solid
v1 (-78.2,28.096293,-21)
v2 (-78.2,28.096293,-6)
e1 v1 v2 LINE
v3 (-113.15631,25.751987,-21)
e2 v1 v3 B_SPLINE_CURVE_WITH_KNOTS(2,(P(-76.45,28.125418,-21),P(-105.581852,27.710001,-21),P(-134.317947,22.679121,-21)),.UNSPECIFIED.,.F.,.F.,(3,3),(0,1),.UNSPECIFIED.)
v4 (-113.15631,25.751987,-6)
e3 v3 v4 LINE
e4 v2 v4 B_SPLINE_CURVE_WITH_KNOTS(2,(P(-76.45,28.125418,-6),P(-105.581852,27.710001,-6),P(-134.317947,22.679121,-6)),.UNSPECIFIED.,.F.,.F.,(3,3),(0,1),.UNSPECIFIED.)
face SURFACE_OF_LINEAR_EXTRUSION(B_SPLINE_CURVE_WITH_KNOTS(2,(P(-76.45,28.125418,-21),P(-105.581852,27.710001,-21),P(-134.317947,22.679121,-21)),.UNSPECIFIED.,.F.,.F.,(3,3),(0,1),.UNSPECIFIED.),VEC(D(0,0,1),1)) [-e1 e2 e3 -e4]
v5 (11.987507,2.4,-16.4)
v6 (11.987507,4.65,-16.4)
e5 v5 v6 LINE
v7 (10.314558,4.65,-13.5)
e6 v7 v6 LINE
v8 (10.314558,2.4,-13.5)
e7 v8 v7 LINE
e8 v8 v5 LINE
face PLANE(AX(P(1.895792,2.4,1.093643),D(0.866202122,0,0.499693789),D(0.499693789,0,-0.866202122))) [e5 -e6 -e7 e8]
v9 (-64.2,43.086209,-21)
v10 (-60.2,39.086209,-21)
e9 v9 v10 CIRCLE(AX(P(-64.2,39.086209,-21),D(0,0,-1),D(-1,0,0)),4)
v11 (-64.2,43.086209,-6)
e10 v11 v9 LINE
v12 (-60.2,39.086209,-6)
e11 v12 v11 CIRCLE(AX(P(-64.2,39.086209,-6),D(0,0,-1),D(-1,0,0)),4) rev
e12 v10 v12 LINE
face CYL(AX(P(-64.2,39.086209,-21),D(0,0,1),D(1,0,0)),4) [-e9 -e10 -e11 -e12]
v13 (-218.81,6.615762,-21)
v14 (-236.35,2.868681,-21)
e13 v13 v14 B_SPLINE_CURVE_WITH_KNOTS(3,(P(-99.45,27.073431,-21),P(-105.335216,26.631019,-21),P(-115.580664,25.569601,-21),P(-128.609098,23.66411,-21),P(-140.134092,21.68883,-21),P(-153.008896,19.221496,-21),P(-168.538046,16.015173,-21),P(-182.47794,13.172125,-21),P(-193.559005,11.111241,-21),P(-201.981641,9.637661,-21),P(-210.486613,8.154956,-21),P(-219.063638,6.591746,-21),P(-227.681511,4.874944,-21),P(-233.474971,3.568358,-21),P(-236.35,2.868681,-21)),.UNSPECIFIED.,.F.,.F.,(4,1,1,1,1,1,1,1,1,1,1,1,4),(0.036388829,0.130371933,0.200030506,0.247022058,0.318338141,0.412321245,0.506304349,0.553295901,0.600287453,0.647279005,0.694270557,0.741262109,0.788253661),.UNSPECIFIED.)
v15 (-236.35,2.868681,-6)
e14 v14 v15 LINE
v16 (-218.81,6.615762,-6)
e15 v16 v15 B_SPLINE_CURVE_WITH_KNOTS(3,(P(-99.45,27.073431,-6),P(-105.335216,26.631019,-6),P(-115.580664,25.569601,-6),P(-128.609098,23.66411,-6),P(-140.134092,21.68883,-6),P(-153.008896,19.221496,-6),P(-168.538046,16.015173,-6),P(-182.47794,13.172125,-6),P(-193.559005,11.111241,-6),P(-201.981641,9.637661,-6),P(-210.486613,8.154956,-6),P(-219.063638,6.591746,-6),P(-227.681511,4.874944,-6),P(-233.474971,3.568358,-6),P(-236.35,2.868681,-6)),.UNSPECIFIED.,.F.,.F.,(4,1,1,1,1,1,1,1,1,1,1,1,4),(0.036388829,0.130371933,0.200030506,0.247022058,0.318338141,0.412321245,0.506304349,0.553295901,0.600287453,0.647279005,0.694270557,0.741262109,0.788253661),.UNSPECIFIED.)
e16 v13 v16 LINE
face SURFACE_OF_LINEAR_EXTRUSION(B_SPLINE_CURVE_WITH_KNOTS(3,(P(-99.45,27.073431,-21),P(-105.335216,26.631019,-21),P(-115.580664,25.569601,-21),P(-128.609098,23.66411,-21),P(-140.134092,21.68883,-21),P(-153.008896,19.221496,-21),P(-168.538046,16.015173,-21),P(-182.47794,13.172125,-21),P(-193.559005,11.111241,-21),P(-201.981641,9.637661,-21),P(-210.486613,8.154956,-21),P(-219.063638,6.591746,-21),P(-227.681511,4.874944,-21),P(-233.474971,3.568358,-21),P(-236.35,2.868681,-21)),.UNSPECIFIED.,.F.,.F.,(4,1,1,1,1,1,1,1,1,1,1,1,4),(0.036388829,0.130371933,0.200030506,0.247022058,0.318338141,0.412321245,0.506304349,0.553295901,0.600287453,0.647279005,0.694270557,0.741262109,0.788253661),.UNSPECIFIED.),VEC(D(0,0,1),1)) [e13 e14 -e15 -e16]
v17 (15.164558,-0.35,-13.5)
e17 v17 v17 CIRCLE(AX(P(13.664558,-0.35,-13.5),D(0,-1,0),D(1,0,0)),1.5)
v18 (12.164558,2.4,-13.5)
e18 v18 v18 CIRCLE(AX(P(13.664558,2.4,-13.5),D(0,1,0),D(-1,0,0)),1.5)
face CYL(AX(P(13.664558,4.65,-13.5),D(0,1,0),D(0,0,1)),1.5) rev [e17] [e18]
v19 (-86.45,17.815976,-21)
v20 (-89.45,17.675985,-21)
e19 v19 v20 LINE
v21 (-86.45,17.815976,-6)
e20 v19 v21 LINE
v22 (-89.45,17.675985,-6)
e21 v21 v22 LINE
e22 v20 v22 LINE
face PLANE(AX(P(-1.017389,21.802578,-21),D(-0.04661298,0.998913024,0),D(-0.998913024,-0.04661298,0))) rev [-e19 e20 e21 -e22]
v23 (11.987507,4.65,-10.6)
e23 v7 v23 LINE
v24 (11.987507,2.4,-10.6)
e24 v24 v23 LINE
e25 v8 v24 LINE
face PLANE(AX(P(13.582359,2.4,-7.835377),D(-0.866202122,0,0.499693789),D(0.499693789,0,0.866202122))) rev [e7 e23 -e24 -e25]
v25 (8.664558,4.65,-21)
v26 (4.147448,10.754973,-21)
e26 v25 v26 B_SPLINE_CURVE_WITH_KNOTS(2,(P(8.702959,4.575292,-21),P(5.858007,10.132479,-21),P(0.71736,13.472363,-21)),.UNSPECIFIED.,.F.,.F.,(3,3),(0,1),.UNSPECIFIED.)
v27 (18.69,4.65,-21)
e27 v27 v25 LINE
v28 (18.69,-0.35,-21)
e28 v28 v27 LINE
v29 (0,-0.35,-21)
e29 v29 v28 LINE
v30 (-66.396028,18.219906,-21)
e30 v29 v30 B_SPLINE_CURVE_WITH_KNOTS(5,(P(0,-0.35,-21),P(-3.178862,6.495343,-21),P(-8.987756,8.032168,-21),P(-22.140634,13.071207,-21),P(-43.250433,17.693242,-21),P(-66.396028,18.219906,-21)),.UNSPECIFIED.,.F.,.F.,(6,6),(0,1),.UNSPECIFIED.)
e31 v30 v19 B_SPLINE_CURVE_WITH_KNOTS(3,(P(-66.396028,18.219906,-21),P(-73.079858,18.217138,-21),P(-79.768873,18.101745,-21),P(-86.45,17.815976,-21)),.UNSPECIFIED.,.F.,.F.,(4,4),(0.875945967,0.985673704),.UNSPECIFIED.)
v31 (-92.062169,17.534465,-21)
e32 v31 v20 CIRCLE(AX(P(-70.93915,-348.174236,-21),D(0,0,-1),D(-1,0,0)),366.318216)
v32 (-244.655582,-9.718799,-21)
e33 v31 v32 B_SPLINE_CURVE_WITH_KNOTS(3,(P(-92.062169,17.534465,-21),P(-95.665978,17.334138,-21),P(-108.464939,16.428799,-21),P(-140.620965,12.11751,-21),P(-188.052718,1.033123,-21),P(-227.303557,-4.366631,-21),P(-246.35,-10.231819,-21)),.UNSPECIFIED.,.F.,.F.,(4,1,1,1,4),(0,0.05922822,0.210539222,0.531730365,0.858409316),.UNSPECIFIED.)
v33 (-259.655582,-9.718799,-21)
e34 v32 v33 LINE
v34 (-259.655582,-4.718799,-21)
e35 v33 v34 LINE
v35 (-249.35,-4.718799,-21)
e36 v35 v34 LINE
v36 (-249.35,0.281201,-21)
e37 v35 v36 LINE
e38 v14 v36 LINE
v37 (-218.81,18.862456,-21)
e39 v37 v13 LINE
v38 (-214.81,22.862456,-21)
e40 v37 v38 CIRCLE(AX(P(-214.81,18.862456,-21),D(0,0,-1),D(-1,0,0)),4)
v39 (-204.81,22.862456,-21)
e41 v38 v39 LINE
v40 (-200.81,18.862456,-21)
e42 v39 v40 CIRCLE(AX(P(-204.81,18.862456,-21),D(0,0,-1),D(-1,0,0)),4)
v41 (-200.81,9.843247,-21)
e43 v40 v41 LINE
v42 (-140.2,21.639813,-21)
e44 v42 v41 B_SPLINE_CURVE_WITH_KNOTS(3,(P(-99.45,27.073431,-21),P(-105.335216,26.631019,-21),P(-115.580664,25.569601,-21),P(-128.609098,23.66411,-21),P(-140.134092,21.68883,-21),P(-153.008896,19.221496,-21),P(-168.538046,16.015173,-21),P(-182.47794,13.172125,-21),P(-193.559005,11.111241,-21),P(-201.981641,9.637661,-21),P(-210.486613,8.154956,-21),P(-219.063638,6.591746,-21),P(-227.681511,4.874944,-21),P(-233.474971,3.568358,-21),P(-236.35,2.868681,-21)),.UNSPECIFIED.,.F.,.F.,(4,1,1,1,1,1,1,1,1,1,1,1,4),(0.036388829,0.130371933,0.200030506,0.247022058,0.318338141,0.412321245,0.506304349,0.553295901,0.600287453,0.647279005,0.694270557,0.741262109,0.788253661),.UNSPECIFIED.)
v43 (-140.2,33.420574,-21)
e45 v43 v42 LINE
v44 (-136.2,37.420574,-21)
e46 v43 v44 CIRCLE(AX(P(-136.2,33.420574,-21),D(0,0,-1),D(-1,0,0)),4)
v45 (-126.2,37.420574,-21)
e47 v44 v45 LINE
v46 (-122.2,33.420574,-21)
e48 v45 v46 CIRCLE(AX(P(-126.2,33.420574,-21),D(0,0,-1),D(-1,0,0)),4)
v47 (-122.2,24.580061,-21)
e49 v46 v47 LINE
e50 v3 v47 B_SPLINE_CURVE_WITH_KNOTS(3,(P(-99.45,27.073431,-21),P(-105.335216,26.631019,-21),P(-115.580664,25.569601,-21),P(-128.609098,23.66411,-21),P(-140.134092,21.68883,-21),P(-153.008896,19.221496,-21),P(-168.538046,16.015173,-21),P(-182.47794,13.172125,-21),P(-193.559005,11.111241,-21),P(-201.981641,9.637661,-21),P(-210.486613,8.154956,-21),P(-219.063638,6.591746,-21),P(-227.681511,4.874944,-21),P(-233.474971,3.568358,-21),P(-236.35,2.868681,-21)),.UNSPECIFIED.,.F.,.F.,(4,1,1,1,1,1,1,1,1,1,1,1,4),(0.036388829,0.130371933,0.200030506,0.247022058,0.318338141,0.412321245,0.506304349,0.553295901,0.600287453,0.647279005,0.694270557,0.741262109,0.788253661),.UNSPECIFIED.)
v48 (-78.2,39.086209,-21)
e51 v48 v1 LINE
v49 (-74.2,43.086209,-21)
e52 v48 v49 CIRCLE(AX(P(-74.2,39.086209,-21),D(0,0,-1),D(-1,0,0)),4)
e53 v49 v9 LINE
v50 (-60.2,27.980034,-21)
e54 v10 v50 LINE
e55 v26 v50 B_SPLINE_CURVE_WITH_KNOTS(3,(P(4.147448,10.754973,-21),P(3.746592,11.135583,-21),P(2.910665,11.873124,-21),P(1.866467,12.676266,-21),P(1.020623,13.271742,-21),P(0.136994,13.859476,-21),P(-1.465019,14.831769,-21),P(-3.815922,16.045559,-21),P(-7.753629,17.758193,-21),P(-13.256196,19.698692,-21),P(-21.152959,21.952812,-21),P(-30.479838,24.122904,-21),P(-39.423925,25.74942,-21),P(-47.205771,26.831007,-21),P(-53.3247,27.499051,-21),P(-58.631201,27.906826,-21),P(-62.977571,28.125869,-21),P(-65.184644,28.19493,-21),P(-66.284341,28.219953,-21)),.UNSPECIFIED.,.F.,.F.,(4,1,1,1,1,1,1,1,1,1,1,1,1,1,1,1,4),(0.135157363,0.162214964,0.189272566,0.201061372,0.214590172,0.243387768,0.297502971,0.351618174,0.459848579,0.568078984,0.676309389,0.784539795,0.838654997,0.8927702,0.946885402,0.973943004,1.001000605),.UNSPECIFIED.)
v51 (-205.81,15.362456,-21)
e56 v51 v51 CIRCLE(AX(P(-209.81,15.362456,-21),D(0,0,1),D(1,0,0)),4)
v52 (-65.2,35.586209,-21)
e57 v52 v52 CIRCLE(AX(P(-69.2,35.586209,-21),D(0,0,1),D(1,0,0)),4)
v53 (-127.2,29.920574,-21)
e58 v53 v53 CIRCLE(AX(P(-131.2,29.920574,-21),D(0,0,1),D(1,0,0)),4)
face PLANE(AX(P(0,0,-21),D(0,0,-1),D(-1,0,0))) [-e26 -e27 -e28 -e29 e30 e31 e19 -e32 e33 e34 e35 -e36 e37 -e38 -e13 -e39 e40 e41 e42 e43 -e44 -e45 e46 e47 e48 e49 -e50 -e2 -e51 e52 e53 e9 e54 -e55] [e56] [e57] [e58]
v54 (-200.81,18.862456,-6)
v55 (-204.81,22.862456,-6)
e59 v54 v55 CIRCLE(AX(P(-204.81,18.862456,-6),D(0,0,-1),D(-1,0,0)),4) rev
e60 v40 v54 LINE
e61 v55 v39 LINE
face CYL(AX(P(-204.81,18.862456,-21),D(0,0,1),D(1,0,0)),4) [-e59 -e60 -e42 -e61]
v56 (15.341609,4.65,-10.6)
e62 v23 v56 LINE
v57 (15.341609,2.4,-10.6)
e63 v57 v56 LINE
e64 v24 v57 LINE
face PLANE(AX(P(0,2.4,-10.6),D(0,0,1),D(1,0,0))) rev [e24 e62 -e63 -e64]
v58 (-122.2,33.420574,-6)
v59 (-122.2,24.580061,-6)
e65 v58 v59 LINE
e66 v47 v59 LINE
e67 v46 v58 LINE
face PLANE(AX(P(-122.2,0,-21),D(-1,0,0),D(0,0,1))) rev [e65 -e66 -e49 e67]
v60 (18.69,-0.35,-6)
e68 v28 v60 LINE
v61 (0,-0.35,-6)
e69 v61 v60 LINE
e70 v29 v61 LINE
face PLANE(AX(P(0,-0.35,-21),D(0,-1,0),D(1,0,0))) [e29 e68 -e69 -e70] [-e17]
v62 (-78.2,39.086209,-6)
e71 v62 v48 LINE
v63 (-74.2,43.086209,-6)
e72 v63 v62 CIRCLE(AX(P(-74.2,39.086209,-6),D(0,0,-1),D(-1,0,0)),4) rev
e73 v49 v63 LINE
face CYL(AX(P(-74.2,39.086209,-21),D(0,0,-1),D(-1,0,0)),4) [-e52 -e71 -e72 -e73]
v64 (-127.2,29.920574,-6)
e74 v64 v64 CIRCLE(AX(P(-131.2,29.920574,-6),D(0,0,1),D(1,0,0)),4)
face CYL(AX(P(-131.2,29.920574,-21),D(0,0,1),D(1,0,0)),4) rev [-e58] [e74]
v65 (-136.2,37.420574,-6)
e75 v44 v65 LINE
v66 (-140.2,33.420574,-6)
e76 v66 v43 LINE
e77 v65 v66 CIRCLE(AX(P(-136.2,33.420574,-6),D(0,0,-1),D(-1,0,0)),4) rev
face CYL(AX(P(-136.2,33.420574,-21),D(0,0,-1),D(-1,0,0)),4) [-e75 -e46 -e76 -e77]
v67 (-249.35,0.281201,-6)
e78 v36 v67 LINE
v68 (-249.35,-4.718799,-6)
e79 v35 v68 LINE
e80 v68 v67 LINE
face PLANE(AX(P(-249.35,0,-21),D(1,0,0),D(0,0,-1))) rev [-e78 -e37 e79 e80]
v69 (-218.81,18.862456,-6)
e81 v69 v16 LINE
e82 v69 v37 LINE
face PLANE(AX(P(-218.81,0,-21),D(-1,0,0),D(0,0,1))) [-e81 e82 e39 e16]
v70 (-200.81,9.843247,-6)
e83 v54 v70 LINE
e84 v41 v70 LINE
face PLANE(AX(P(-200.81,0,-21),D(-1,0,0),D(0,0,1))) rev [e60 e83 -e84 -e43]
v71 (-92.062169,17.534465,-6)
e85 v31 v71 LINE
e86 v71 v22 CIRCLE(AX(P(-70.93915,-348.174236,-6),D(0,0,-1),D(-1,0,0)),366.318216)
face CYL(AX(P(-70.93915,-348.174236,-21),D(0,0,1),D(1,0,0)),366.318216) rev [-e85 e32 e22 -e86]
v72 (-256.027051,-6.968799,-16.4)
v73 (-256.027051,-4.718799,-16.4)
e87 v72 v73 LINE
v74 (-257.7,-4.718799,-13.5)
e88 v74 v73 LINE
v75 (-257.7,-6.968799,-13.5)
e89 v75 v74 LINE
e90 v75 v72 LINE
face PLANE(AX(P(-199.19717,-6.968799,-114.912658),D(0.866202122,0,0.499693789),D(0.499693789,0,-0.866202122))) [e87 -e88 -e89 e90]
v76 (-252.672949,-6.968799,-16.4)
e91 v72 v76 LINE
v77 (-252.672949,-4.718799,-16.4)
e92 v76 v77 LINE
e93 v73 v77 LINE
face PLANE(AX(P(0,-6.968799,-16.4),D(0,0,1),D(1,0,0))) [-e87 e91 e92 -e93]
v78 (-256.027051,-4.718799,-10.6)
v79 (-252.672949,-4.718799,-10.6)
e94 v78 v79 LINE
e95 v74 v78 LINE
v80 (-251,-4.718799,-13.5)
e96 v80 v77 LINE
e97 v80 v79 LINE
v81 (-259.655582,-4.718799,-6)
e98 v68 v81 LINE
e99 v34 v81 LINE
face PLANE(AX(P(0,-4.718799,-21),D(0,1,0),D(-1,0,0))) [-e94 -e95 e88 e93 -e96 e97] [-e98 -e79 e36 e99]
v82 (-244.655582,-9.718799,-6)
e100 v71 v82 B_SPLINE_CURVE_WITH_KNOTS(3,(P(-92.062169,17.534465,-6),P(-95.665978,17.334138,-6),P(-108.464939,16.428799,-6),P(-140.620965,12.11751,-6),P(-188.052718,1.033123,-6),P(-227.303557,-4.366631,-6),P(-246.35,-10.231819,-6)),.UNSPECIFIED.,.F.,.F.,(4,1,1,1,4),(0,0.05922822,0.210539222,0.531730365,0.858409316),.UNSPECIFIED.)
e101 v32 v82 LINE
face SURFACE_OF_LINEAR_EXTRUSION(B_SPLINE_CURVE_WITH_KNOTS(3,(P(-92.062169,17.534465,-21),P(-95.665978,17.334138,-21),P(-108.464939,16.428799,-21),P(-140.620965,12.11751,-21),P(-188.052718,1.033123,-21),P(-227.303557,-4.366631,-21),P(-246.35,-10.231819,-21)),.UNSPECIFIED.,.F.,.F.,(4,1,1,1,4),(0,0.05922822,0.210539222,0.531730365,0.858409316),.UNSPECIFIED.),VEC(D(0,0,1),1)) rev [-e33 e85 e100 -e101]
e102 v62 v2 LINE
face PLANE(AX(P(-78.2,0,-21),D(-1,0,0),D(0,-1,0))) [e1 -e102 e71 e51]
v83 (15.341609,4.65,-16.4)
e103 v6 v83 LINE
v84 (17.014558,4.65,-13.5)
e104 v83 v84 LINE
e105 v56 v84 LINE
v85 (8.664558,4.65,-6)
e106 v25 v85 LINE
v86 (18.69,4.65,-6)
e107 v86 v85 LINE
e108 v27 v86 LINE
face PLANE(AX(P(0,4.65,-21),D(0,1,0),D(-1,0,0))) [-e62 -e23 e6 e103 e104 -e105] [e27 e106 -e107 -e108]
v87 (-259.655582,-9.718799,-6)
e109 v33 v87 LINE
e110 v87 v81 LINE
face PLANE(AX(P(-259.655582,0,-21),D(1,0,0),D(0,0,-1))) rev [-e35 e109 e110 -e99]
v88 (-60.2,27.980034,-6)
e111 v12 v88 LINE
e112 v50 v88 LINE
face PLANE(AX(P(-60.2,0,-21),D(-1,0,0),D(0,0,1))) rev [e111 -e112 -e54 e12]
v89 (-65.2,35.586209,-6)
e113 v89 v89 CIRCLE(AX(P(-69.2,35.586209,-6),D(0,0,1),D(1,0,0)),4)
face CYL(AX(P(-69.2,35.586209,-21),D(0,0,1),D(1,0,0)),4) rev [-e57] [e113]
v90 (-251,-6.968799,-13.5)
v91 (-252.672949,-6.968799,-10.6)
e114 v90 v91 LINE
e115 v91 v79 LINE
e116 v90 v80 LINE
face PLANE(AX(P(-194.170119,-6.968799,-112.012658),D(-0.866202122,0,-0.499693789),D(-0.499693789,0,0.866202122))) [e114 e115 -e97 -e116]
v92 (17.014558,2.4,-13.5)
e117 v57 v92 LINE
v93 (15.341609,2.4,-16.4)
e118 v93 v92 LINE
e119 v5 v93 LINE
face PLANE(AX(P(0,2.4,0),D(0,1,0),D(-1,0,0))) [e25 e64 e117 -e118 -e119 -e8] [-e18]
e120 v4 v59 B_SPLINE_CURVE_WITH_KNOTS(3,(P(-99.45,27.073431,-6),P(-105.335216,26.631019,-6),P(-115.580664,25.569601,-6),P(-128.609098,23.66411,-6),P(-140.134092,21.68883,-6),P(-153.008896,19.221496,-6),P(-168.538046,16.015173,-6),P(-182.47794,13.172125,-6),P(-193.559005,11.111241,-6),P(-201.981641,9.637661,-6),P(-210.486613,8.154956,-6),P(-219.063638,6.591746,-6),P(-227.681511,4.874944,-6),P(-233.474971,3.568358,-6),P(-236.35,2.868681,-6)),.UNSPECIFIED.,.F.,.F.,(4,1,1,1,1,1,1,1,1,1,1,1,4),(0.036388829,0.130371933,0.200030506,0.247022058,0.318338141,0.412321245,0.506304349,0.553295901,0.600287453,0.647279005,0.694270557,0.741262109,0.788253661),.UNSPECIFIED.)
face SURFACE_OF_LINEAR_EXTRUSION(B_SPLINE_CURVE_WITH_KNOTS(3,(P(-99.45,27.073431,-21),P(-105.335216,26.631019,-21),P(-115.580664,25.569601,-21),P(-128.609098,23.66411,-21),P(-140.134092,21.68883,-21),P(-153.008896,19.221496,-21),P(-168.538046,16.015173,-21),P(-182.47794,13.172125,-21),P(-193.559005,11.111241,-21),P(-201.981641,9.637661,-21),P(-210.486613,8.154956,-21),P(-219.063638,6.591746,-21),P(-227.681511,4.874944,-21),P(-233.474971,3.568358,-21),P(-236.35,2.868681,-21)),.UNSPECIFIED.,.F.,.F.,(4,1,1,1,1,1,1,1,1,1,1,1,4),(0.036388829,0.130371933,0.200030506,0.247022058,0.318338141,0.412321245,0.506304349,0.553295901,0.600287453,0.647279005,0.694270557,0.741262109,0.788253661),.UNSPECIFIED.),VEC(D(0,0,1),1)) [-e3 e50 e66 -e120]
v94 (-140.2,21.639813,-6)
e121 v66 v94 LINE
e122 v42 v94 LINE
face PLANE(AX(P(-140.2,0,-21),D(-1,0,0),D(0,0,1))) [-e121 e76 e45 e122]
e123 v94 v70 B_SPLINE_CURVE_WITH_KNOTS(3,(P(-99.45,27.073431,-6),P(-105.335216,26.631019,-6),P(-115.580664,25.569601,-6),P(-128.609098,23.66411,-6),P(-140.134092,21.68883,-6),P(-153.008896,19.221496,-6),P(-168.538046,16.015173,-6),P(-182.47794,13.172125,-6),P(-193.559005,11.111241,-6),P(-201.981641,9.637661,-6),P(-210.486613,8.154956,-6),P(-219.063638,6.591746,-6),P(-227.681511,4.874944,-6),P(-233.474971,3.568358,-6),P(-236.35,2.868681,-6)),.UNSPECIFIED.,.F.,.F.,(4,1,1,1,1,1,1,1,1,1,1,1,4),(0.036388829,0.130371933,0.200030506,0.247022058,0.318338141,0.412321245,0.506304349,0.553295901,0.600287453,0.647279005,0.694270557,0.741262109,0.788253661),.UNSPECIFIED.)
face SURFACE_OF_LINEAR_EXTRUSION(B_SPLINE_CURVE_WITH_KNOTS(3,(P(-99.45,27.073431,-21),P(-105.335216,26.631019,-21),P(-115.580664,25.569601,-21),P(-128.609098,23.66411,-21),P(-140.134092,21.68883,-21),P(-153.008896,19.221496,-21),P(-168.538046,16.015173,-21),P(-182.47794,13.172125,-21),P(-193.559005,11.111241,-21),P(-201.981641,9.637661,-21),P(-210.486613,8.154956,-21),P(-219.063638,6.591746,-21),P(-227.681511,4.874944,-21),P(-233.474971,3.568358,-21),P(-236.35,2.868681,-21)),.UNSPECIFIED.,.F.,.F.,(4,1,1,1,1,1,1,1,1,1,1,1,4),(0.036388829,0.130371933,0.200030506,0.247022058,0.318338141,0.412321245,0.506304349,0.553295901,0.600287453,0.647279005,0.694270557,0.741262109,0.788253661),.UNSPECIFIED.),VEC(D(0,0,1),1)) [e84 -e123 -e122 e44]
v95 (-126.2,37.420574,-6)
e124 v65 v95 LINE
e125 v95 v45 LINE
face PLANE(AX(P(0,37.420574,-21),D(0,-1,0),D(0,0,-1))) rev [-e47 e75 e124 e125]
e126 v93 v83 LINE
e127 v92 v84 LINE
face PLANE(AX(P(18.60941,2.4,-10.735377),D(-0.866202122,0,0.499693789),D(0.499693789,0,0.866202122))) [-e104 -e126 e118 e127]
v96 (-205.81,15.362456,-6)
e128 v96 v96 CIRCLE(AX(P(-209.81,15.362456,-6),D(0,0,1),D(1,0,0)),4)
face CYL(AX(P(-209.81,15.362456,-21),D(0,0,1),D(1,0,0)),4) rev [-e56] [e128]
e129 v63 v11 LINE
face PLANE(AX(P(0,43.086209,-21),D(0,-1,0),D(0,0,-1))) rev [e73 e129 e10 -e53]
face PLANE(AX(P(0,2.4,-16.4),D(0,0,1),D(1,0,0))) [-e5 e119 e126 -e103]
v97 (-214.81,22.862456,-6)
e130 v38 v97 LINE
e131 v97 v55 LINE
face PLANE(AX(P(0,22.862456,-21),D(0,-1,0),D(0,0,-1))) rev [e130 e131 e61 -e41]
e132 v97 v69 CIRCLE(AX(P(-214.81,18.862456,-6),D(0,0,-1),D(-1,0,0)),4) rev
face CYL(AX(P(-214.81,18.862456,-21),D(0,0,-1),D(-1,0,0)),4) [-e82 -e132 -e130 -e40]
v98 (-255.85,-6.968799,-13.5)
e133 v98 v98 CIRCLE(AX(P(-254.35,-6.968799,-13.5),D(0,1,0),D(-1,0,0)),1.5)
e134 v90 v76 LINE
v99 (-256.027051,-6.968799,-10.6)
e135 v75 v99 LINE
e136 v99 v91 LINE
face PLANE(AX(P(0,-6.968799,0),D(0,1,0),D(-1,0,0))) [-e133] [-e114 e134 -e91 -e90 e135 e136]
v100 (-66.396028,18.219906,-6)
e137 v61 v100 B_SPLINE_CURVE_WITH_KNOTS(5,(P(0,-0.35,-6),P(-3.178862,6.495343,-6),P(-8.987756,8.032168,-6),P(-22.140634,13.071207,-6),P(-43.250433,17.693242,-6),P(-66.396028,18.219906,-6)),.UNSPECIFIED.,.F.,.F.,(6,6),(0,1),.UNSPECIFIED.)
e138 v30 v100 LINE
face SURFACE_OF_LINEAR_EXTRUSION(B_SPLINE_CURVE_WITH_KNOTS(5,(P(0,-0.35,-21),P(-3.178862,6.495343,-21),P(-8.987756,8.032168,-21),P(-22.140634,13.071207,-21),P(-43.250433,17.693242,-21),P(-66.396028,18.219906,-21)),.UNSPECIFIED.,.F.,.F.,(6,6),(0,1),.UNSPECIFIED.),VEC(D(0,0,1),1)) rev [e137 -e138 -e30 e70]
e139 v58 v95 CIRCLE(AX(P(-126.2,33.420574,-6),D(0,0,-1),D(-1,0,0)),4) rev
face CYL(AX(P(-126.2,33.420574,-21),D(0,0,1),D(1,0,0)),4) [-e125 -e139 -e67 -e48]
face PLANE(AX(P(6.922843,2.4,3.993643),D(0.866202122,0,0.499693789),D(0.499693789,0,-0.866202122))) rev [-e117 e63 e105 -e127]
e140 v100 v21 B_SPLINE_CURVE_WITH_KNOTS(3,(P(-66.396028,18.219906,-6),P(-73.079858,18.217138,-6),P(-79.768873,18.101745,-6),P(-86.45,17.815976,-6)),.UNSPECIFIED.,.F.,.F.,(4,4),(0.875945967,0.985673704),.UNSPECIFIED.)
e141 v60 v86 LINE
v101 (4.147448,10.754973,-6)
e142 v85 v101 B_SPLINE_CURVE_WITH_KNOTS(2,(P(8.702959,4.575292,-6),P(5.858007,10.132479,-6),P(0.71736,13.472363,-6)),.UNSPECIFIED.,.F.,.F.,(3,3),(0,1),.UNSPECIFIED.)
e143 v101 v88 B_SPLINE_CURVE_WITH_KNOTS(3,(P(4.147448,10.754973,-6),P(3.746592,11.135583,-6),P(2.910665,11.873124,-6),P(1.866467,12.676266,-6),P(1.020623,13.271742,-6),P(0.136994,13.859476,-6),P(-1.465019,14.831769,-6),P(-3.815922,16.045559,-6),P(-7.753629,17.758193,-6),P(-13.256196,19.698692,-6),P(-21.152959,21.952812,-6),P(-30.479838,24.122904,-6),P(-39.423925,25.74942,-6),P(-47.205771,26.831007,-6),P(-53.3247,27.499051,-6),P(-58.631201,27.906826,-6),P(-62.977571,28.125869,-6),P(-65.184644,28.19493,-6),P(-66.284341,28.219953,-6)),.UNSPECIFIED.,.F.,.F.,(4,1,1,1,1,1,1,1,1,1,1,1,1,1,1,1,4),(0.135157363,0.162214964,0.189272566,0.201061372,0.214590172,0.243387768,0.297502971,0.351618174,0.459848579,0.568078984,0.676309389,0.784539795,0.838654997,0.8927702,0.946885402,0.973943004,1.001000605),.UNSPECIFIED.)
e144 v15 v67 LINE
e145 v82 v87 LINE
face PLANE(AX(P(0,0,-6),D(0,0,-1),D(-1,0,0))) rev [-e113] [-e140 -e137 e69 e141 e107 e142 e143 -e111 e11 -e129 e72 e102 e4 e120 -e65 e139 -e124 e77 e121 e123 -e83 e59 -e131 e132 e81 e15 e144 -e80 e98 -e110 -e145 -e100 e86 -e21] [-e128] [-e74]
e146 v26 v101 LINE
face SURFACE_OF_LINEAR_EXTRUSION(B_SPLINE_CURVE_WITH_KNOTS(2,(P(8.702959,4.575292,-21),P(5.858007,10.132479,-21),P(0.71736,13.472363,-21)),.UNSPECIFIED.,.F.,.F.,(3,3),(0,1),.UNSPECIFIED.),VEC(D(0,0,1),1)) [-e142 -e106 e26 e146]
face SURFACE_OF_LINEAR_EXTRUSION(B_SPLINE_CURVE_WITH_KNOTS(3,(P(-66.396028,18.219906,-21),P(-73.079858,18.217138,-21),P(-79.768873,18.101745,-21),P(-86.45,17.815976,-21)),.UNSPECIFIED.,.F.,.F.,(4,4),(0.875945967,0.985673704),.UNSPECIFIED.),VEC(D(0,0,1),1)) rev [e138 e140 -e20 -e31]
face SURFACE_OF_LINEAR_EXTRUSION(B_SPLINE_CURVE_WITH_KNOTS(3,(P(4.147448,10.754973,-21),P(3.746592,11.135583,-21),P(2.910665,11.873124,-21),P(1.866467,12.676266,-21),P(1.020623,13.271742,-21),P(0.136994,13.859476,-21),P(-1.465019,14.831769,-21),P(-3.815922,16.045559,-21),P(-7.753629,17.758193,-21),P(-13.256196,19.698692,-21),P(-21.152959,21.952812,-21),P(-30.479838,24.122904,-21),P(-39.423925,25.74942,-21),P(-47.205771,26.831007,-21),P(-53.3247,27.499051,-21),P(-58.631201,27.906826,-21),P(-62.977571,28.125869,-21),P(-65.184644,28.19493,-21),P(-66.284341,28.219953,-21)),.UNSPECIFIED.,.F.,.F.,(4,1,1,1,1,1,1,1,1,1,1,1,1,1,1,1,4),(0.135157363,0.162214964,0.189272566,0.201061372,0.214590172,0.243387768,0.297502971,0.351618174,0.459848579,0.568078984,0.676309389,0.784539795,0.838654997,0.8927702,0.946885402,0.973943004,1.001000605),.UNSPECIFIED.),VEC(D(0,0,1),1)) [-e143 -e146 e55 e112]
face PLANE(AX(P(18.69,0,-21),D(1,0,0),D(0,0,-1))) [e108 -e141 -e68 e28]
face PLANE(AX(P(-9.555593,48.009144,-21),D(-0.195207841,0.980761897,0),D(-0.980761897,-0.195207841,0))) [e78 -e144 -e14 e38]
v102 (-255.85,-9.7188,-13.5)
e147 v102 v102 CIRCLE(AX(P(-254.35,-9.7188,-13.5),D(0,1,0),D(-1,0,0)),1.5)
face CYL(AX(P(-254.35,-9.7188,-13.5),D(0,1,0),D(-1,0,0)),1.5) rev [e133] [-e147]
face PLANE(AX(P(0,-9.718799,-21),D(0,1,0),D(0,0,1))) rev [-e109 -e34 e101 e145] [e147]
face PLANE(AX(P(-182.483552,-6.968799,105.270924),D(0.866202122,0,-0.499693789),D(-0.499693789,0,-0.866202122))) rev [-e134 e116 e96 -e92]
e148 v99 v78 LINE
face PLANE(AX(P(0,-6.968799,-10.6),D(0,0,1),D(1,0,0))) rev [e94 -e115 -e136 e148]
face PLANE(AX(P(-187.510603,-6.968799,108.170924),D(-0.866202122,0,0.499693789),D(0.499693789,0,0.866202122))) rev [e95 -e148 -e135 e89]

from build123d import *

# Parameters (mm, degrees)
BOSS_EXTRUDE14_DEPTH            = 15
SKETCH9_W                       = 10.305582395
SKETCH9_H                       = 5
BOSS_EXTRUDE15_DEPTH            = 15
BOSS_EXTRUDE16_START            = -15
BOSS_EXTRUDE16_OUTLINE_R        = 4
BOSS_EXTRUDE16_DEPTH            = 15
FILLET1_R                       = 4
CUT_EXTRUDE2_DEPTH              = 2.25
CUT_EXTRUDE3_DEPTH              = 2.25
F_3_0MM_DOWEL_HOLE1_D           = 3
F_3_0MM_DOWEL_HOLE1_CSINK_D     = 3.05
F_3_0MM_DOWEL_HOLE1_CSINK_ANGLE = 90
SKETCH16_R                      = 1.5
CUT_EXTRUDE4_DEPTH              = 265.853431953


# Read off the part's stored shape, not the designer's step: Boss-Extrude14, Boss-Extrude16
with BuildPart() as part:
    # Boss-Extrude14 outline → Boss-Extrude14 (new body)
    with BuildSketch(Plane(origin=(0, 0, -6), x_dir=(-1, 0, 0), z_dir=(0, 0, -1))):
        with BuildLine():
            Line((249.35, -9.718799499), (249.35, 0.281200501))
            Line((249.35, 0.281200501), (236.35, 2.868680647))
            add(Edge.make_bspline(
                [(113.156309789, 25.751987472), (114.460208978, 25.59959164), (120.100287856, 24.908577179), (128.609098159, 23.664110071), (140.134091586, 21.688830409), (153.008895552, 19.221496185), (168.538046321, 16.015172699), (182.477939999, 13.172125281), (193.559005245, 11.111240975), (201.981640704, 9.637661129), (210.486612866, 8.154956205), (219.063637957, 6.591746422), (227.68151116, 4.874943897), (233.474971, 3.568357951), (236.35, 2.868680647)],
                knots=[0.109458463, 0.109458463, 0.109458463, 0.109458463, 0.130371933, 0.200030506, 0.247022058, 0.318338141, 0.412321245, 0.506304349, 0.553295901, 0.600287453, 0.647279005, 0.694270557, 0.741262109, 0.788253661, 0.788253661, 0.788253661, 0.788253661], degree=3))
            add(Edge.make_bspline(
                [(76.45, 28.125418087), (94.882372903, 27.862574162), (113.156309789, 25.751987472)],
                knots=[0, 0, 0, 0.632722323, 0.632722323, 0.632722323], degree=2))
            add(Edge.make_bspline(
                [(66.284340587, 28.219952736), (67.129544996, 28.219602739), (68.818588071, 28.215923169), (71.36030606, 28.198672488), (73.903160315, 28.169538769), (75.601337427, 28.141603711), (76.45, 28.125418087)],
                knots=[0.875312122, 0.875312122, 0.875312122, 0.875312122, 0.888961276, 0.902610431, 0.916259586, 0.92990874, 0.92990874, 0.92990874, 0.92990874], degree=3))
            add(Edge.make_bspline(
                [(-4.147448422, 10.754973325), (-3.746592061, 11.135583203), (-2.910664688, 11.873123525), (-1.8664669, 12.676265805), (-1.020623492, 13.271741618), (-0.136993775, 13.859475937), (1.465019188, 14.831768722), (3.815921844, 16.045559455), (7.753628889, 17.758192835), (13.256195767, 19.698691993), (21.152959065, 21.952811545), (30.479838242, 24.122904012), (39.4239247, 25.749420494), (47.205771024, 26.831006606), (53.324700432, 27.499051298), (58.631201034, 27.906826379), (62.977570557, 28.125868706), (65.18464413, 28.194929818), (66.284340587, 28.219952736)],
                knots=[0.135157363, 0.135157363, 0.135157363, 0.135157363, 0.162214964, 0.189272566, 0.201061372, 0.214590172, 0.243387768, 0.297502971, 0.351618174, 0.459848579, 0.568078984, 0.676309389, 0.784539795, 0.838654997, 0.8927702, 0.946885402, 0.973943004, 1.001000605, 1.001000605, 1.001000605, 1.001000605], degree=3))
            add(Edge.make_bspline(
                [(-8.702959439, 4.575291566), (-6.890883257, 8.114910032), (-4.147448422, 10.754973325)],
                knots=[0, 0, 0, 0.636944249, 0.636944249, 0.636944249], degree=2))
            add(Edge.make_bspline(
                [(-8.702959439, 4.575291566), (-8.771267052, 4.454592439), (-8.899970783, 4.219174636), (-9.174274638, 3.674724808), (-9.523622742, 2.874059155), (-9.910621046, 1.66916954), (-10.123727188, 0.514933148), (-10.179306724, -0.189247064), (-10.188216911, -0.35)],
                knots=[0, 0, 0, 0, 0.000508489, 0.001016978, 0.002033955, 0.003050933, 0.00394155, 0.004195794, 0.004195794, 0.004195794, 0.004195794], degree=3))
            Line((-10.188216911, -0.35), (0, -0.35))
            add(Edge.make_bspline(
                [(0, -0.35), (3.178862469, 6.495343287), (8.987756305, 8.032168144), (22.140633739, 13.071207305), (43.250433247, 17.69324185), (66.39602757, 18.219905629)],
                knots=[0, 0, 0, 0, 0, 0, 1, 1, 1, 1, 1, 1], degree=5))
            add(Edge.make_bspline(
                [(66.39602757, 18.219905629), (73.079858249, 18.217137873), (79.768873399, 18.101745103), (86.45, 17.815976098)],
                knots=[0.875945967, 0.875945967, 0.875945967, 0.875945967, 0.985673704, 0.985673704, 0.985673704, 0.985673704], degree=3))
            Line((86.45, 17.815976098), (89.45, 17.675984992))
            ThreePointArc((89.45, 17.675984992), (90.756210616, 17.607556707), (92.062168571, 17.534464817))
            add(Edge.make_bspline(
                [(92.062168571, 17.534464817), (95.665977641, 17.334138157), (108.464938821, 16.428798519), (140.620964858, 12.117510077), (187.478425037, 1.167330167), (226.131267819, -4.204534739), (244.655582392, -9.718799508)],
                knots=[0, 0, 0, 0, 0.05922822, 0.210539222, 0.531730365, 0.848733007, 0.848733007, 0.848733007, 0.848733007], degree=3))
            Line((244.655582392, -9.718799508), (249.35, -9.718799499))
        make_face()
    extrude(amount=BOSS_EXTRUDE14_DEPTH)

    # Sketch9 → Boss-Extrude15 (add)
    with BuildSketch(Plane.XY.offset(-6)):
        with BuildLine():
            add(Edge.make_bspline(
                [(8.702959439, 4.575291566), (8.771267052, 4.454592439), (8.899970783, 4.219174636), (9.174274638, 3.674724808), (9.523622742, 2.874059155), (9.910621046, 1.66916954), (10.123727188, 0.514933148), (10.179306724, -0.189247064), (10.188216911, -0.35)],
                knots=[0, 0, 0, 0, 0.000508489, 0.001016978, 0.002033955, 0.003050933, 0.00394155, 0.004195794, 0.004195794, 0.004195794, 0.004195794], degree=3))
            Line((10.188216911, -0.35), (18.69, -0.35))
            Line((18.69, -0.35), (18.69, 4.65))
            Line((18.69, 4.65), (8.664557691, 4.65))
            add(Edge.make_bspline(
                [(8.702959439, 4.575291566), (8.683810567, 4.612696009), (8.664557691, 4.65)],
                knots=[0, 0, 0, 0.006730823, 0.006730823, 0.006730823], degree=2))
        make_face()
        with Locations((-254.502791198, -7.218799499)):
            Rectangle(SKETCH9_W, SKETCH9_H)
    extrude(amount=-BOSS_EXTRUDE15_DEPTH)

    # Boss-Extrude16 outline → Boss-Extrude16 (add)
    # profile 1 of 3: a face of its own
    with BuildSketch(Plane.XY.offset(-6).offset(BOSS_EXTRUDE16_START)):
        with BuildLine():
            add(Edge.make_bspline(
                [(-200.81, 9.843246703), (-201.204842604, 9.774216263), (-204.419312994, 9.212692224), (-210.400725126, 8.169929349), (-216.031409877, 7.144376286), (-218.81, 6.615762453)],
                knots=[0.593701678, 0.593701678, 0.593701678, 0.593701678, 0.600287453, 0.647279005, 0.69284692, 0.69284692, 0.69284692, 0.69284692], degree=3))
            Line((-200.81, 9.843246703), (-200.81, 22.86245595))
            Line((-200.81, 22.86245595), (-218.81, 22.86245595))
            Line((-218.81, 22.86245595), (-218.81, 6.615762453))
        make_face()
        with Locations((-209.81, 15.36245595)):
            Circle(BOSS_EXTRUDE16_OUTLINE_R, mode=Mode.SUBTRACT)
    # profile 2 of 3: a face of its own
    with BuildSketch(Plane.XY.offset(-6).offset(BOSS_EXTRUDE16_START)):
        with BuildLine():
            add(Edge.make_bspline(
                [(-122.199999995, 24.58006078), (-124.804407306, 24.210507661), (-130.301243555, 23.374091651), (-136.28735582, 22.348126136), (-139.677142176, 21.735093133), (-140.2, 21.639813309)],
                knots=[0.15796988, 0.15796988, 0.15796988, 0.15796988, 0.200030506, 0.247022058, 0.255600029, 0.255600029, 0.255600029, 0.255600029], degree=3))
            Line((-122.199999995, 24.58006078), (-122.2, 37.420573855))
            Line((-122.2, 37.420573855), (-140.2, 37.420573855))
            Line((-140.2, 37.420573855), (-140.2, 21.639813309))
        make_face()
        with Locations((-131.2, 29.920573855)):
            Circle(BOSS_EXTRUDE16_OUTLINE_R, mode=Mode.SUBTRACT)
    # profile 3 of 3: a face of its own
    with BuildSketch(Plane.XY.offset(-6).offset(BOSS_EXTRUDE16_START)):
        with BuildLine():
            Line((-60.199999997, 27.980034372), (-60.2, 43.08620947))
            Line((-60.2, 43.08620947), (-78.2, 43.08620947))
            Line((-78.2, 43.08620947), (-78.199999995, 28.096292606))
            add(Edge.make_bspline(
                [(-76.45, 28.125418087), (-77.325178587, 28.112938121), (-78.199999995, 28.096292606)],
                knots=[0, 0, 0, 0.030041983, 0.030041983, 0.030041983], degree=2))
            add(Edge.make_bspline(
                [(-66.284340587, 28.219952736), (-67.129544996, 28.219602739), (-68.818588071, 28.215923169), (-71.36030606, 28.198672488), (-73.903160315, 28.169538769), (-75.601337427, 28.141603711), (-76.45, 28.125418087)],
                knots=[0.875312122, 0.875312122, 0.875312122, 0.875312122, 0.888961276, 0.902610431, 0.916259586, 0.92990874, 0.92990874, 0.92990874, 0.92990874], degree=3))
            add(Edge.make_bspline(
                [(-60.199999997, 27.980034372), (-61.122523668, 28.03215495), (-63.139027933, 28.130920838), (-65.18464413, 28.194929818), (-66.284340587, 28.219952736)],
                knots=[0.950844173, 0.950844173, 0.950844173, 0.950844173, 0.973943004, 1.001000605, 1.001000605, 1.001000605, 1.001000605], degree=3))
        make_face()
        with Locations((-69.2, 35.58620947)):
            Circle(BOSS_EXTRUDE16_OUTLINE_R, mode=Mode.SUBTRACT)
    extrude(amount=BOSS_EXTRUDE16_DEPTH)

    # Fillet1
    fillet1_edges = [part.edges().sort_by_distance(p)[0] for p in [
        (-200.81, 22.86245595, -13.5),
        (-218.81, 22.86245595, -13.5),
        (-140.2, 37.420573855, -13.5),
        (-122.2, 37.420573855, -13.5),
        (-60.2, 43.08620947, -13.5),
        (-78.2, 43.08620947, -13.5),
    ]]
    fillet(fillet1_edges, radius=FILLET1_R)

    # Sketch12 → Cut-Extrude2 (cut)
    with BuildSketch(Plane(origin=(0, -4.718799499, 0), x_dir=(1, 0, 0), z_dir=(0, 1, 0))):
        with BuildLine():
            Line((-252.85, 13.5), (-251, 13.5))
            Line((-251, 13.5), (-252.672949017, 16.4))
            Line((-252.672949017, 16.4), (-256.027050983, 16.4))
            Line((-256.027050983, 16.4), (-257.7, 13.5))
            Line((-257.7, 13.5), (-255.85, 13.5))
            ThreePointArc((-255.85, 13.5), (-254.35, 15), (-252.85, 13.5))
        make_face()
        with BuildLine():
            Line((-252.672949017, 10.6), (-251, 13.5))
            Line((-251, 13.5), (-252.85, 13.5))
            ThreePointArc((-252.85, 13.5), (-254.35, 12), (-255.85, 13.5))
            Line((-255.85, 13.5), (-257.7, 13.5))
            Line((-257.7, 13.5), (-256.027050983, 10.6))
            Line((-256.027050983, 10.6), (-252.672949017, 10.6))
        make_face()
        with BuildLine():
            ThreePointArc((-255.85, 13.5), (-254.35, 12), (-252.85, 13.5))
            Line((-252.85, 13.5), (-254.35, 13.5))
            Line((-254.35, 13.5), (-255.85, 13.5))
        make_face()
    extrude(amount=-CUT_EXTRUDE2_DEPTH, mode=Mode.SUBTRACT)

    # Sketch14 → Cut-Extrude3 (cut)
    with BuildSketch(Plane(origin=(0, 4.65, 0), x_dir=(1, 0, 0), z_dir=(0, 1, 0))):
        with BuildLine():
            ThreePointArc((13.664557695, 15), (14.725217866, 14.560660172), (15.164557695, 13.5))
            Line((15.164557695, 13.5), (17.014557695, 13.5))
            Line((17.014557695, 13.5), (15.341608678, 16.4))
            Line((15.341608678, 16.4), (13.664557695, 16.4))
            Line((13.664557695, 16.4), (13.664557695, 15))
        make_face()
        with BuildLine():
            Line((10.314557695, 13.5), (12.164557695, 13.5))
            ThreePointArc((12.164557695, 13.5), (12.603897523, 14.560660172), (13.664557695, 15))
            Line((13.664557695, 15), (13.664557695, 16.4))
            Line((13.664557695, 16.4), (11.987506712, 16.4))
            Line((11.987506712, 16.4), (10.314557695, 13.5))
        make_face()
        with BuildLine():
            Line((11.987506712, 10.6), (13.664557695, 10.6))
            Line((13.664557695, 10.6), (13.664557695, 12))
            ThreePointArc((13.664557695, 12), (12.603897523, 12.439339828), (12.164557695, 13.5))
            Line((12.164557695, 13.5), (10.314557695, 13.5))
            Line((10.314557695, 13.5), (11.987506712, 10.6))
        make_face()
        with BuildLine():
            Line((13.664557695, 12), (13.664557695, 10.6))
            Line((13.664557695, 10.6), (15.341608678, 10.6))
            Line((15.341608678, 10.6), (17.014557695, 13.5))
            Line((17.014557695, 13.5), (15.164557695, 13.5))
            ThreePointArc((15.164557695, 13.5), (14.725217866, 12.439339828), (13.664557695, 12))
        make_face()
    extrude(amount=-CUT_EXTRUDE3_DEPTH, mode=Mode.SUBTRACT)

    # Ø3.0mm Dowel Hole1 (through all)
    with Locations(Plane(origin=(0, 4.65, 0), x_dir=(1, 0, 0), z_dir=(0, 1, 0))):
        with Locations((13.664557695, 13.5)):
            CounterSinkHole(F_3_0MM_DOWEL_HOLE1_D / 2, F_3_0MM_DOWEL_HOLE1_CSINK_D / 2, counter_sink_angle=F_3_0MM_DOWEL_HOLE1_CSINK_ANGLE)

    # Sketch16 → Cut-Extrude4 (cut, through all)
    with BuildSketch(Plane(origin=(0, -4.718799499, 0), x_dir=(1, 0, 0), z_dir=(0, 1, 0))):
        with Locations(Location((-254.35, 13.5, 0), (0, 0, 180))):
            Circle(SKETCH16_R)
    extrude(amount=-CUT_EXTRUDE4_DEPTH, mode=Mode.SUBTRACT)


solid = part.part
